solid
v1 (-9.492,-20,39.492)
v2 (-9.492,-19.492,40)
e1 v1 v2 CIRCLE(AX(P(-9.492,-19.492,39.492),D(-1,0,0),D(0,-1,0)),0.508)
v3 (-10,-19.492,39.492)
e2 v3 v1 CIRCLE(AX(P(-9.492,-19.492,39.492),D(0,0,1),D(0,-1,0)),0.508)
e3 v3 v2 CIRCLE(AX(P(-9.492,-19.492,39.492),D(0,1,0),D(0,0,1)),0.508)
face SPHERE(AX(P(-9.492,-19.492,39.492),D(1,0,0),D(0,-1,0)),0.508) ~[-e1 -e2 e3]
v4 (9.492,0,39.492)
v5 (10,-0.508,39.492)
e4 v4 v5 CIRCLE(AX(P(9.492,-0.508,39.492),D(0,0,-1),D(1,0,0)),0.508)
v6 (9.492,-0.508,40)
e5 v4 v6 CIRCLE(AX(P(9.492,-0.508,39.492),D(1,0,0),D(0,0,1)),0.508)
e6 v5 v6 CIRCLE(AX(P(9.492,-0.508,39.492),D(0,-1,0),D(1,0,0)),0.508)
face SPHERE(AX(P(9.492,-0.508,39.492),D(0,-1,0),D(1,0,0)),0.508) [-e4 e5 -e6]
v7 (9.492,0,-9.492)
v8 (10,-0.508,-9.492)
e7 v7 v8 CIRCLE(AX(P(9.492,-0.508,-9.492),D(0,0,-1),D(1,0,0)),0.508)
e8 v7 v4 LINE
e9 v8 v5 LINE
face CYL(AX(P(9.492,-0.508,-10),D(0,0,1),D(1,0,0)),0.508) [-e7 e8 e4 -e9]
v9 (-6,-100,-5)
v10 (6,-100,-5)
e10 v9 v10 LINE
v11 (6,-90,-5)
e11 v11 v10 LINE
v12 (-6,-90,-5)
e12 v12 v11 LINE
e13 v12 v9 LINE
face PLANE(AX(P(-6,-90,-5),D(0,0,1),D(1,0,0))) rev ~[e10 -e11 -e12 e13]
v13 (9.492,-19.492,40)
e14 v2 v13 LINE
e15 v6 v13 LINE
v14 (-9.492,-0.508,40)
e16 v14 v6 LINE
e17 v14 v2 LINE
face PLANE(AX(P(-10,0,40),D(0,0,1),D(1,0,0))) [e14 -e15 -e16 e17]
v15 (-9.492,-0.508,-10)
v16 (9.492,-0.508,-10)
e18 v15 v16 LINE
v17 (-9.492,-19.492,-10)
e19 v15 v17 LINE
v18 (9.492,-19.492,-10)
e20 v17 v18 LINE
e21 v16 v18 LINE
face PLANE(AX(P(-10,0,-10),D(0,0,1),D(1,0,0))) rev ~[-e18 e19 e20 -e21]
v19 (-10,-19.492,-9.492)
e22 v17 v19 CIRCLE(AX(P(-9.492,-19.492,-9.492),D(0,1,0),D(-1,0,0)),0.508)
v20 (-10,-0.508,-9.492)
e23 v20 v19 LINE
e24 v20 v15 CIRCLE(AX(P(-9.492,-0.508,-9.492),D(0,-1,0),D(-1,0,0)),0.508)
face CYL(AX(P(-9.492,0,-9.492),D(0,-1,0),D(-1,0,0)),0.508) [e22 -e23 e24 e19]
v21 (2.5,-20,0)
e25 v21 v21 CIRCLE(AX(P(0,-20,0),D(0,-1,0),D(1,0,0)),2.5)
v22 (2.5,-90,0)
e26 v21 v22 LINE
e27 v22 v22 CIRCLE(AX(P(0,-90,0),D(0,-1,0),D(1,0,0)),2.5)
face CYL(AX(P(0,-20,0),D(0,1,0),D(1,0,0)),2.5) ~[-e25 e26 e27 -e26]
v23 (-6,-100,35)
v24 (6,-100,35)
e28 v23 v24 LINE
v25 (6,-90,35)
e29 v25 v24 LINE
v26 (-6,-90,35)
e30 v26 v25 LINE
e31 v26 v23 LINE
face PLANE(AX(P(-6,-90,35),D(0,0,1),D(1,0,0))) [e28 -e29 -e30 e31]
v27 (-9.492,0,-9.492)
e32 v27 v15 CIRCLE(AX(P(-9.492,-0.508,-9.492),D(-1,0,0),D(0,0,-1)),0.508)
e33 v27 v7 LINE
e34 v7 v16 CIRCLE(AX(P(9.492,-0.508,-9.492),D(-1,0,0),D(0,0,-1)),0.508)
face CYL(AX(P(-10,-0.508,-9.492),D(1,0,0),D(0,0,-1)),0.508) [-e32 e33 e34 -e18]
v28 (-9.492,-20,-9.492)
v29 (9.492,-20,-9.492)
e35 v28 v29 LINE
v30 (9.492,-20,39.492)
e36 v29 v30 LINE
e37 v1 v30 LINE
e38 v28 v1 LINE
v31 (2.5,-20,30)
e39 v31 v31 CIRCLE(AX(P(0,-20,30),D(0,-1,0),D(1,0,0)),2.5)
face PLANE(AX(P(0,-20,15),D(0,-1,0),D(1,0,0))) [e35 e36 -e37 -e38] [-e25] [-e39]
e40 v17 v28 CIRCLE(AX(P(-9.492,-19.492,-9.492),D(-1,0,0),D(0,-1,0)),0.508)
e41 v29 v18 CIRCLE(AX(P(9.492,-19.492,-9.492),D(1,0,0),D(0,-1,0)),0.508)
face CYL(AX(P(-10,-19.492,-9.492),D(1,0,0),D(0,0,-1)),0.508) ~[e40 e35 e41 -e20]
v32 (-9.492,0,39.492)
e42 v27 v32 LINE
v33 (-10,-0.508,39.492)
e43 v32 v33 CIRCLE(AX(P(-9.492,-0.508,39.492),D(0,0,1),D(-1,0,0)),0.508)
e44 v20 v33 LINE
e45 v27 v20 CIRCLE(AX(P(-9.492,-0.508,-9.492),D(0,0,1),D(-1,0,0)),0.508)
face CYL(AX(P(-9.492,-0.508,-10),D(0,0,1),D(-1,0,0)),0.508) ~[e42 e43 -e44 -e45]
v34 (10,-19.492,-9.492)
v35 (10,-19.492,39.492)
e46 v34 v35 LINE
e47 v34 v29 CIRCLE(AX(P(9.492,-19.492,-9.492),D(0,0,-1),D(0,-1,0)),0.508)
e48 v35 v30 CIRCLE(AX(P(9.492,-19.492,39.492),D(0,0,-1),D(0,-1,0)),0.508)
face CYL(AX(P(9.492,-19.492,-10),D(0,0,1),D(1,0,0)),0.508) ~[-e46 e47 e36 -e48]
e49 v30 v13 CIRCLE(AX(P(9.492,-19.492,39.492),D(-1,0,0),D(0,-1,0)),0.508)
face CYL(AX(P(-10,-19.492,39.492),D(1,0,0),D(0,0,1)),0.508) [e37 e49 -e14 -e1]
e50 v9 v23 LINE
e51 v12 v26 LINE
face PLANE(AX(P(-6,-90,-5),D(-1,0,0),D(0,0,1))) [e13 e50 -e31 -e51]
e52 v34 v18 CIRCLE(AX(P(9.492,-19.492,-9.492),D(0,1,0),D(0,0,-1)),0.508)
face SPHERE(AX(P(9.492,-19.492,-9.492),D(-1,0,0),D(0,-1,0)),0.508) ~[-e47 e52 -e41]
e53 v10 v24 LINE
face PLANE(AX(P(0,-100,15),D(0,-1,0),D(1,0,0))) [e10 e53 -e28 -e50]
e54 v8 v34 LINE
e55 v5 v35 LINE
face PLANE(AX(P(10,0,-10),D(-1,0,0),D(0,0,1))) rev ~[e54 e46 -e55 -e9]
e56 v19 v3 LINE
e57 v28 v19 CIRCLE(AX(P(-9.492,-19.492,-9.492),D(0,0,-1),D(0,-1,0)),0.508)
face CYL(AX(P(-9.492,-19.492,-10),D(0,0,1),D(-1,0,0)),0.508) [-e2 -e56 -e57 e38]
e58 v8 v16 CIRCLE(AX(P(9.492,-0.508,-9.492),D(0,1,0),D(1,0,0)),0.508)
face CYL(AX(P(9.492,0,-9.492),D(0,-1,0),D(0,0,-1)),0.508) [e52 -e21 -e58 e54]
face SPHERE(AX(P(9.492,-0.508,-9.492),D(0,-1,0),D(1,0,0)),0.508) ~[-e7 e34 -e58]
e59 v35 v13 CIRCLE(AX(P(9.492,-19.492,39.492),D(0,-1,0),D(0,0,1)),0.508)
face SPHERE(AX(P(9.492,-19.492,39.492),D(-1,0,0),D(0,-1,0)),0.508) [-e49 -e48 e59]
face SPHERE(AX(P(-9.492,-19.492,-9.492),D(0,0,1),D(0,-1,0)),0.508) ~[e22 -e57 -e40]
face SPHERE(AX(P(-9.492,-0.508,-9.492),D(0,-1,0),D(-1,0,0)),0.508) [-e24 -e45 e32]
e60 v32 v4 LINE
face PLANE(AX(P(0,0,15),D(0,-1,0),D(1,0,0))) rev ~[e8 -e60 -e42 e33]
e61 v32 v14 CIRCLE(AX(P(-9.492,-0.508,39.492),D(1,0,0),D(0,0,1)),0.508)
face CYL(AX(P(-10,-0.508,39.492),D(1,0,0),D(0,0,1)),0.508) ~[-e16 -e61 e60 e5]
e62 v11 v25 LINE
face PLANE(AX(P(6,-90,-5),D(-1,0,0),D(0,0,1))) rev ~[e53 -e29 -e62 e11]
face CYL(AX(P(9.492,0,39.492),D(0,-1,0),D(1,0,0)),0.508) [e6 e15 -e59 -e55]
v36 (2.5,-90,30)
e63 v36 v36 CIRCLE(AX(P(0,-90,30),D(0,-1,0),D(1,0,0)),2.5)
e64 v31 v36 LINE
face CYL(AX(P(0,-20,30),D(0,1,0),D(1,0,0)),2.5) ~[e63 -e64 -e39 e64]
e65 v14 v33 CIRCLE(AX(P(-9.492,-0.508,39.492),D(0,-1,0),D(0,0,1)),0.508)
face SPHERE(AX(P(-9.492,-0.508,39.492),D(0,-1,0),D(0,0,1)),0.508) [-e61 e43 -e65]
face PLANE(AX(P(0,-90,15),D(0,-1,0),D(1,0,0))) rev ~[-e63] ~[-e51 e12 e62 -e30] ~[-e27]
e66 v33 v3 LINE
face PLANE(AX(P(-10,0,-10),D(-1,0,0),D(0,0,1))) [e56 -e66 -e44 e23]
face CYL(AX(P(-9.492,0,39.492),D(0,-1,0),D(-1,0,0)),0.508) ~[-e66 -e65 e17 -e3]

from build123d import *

# Parameters (mm, degrees)
F0_W     = 20
F0_H     = 50
F1_DEPTH = 20
F2_R     = 0.508
F3_R     = 2.5
F4_DEPTH = 70
F5_W     = 12
F5_H     = 40
F5_R     = 2.5
F6_DEPTH = 10


# Not quite as in the source:
# - a feature names something its author has since deleted; it is built from what else it names


with BuildPart() as f1:
    # F0 (on Front) → F1 (new body)
    with BuildSketch(Plane.XZ):
        with Locations((0, 15)):
            Rectangle(F0_W, F0_H)
    extrude(amount=F1_DEPTH)

    # F2
    f2_edges = [f1.edges().sort_by_distance(p)[0] for p in [
        (0, -20, 40),
        (-10, -20, 15),
        (0, -20, -10),
        (10, -20, 15),
        (10, -10, -10),
        (10, -10, 40),
        (10, 0, 15),
        (-10, -10, 40),
        (0, 0, 40),
        (-10, -10, -10),
        (-10, 0, 15),
        (0, 0, -10),
    ]]
    fillet(f2_edges, radius=F2_R)

    # F3 (on face) → F4 (join)
    with BuildSketch(Plane.XZ.offset(20)):
        with Locations((0, 30)):
            Circle(F3_R)
        Circle(F3_R)
    extrude(amount=F4_DEPTH)

    # F5 (on face) → F6 (join)
    with BuildSketch(Plane.XZ.offset(90)):
        with Locations((0, 15)):
            Rectangle(F5_W, F5_H)
        with Locations((0, 30)):
            Circle(F5_R, mode=Mode.SUBTRACT)
        with Locations((0, 30)):
            Circle(F5_R)
    extrude(amount=F6_DEPTH)


solid = f1.part
